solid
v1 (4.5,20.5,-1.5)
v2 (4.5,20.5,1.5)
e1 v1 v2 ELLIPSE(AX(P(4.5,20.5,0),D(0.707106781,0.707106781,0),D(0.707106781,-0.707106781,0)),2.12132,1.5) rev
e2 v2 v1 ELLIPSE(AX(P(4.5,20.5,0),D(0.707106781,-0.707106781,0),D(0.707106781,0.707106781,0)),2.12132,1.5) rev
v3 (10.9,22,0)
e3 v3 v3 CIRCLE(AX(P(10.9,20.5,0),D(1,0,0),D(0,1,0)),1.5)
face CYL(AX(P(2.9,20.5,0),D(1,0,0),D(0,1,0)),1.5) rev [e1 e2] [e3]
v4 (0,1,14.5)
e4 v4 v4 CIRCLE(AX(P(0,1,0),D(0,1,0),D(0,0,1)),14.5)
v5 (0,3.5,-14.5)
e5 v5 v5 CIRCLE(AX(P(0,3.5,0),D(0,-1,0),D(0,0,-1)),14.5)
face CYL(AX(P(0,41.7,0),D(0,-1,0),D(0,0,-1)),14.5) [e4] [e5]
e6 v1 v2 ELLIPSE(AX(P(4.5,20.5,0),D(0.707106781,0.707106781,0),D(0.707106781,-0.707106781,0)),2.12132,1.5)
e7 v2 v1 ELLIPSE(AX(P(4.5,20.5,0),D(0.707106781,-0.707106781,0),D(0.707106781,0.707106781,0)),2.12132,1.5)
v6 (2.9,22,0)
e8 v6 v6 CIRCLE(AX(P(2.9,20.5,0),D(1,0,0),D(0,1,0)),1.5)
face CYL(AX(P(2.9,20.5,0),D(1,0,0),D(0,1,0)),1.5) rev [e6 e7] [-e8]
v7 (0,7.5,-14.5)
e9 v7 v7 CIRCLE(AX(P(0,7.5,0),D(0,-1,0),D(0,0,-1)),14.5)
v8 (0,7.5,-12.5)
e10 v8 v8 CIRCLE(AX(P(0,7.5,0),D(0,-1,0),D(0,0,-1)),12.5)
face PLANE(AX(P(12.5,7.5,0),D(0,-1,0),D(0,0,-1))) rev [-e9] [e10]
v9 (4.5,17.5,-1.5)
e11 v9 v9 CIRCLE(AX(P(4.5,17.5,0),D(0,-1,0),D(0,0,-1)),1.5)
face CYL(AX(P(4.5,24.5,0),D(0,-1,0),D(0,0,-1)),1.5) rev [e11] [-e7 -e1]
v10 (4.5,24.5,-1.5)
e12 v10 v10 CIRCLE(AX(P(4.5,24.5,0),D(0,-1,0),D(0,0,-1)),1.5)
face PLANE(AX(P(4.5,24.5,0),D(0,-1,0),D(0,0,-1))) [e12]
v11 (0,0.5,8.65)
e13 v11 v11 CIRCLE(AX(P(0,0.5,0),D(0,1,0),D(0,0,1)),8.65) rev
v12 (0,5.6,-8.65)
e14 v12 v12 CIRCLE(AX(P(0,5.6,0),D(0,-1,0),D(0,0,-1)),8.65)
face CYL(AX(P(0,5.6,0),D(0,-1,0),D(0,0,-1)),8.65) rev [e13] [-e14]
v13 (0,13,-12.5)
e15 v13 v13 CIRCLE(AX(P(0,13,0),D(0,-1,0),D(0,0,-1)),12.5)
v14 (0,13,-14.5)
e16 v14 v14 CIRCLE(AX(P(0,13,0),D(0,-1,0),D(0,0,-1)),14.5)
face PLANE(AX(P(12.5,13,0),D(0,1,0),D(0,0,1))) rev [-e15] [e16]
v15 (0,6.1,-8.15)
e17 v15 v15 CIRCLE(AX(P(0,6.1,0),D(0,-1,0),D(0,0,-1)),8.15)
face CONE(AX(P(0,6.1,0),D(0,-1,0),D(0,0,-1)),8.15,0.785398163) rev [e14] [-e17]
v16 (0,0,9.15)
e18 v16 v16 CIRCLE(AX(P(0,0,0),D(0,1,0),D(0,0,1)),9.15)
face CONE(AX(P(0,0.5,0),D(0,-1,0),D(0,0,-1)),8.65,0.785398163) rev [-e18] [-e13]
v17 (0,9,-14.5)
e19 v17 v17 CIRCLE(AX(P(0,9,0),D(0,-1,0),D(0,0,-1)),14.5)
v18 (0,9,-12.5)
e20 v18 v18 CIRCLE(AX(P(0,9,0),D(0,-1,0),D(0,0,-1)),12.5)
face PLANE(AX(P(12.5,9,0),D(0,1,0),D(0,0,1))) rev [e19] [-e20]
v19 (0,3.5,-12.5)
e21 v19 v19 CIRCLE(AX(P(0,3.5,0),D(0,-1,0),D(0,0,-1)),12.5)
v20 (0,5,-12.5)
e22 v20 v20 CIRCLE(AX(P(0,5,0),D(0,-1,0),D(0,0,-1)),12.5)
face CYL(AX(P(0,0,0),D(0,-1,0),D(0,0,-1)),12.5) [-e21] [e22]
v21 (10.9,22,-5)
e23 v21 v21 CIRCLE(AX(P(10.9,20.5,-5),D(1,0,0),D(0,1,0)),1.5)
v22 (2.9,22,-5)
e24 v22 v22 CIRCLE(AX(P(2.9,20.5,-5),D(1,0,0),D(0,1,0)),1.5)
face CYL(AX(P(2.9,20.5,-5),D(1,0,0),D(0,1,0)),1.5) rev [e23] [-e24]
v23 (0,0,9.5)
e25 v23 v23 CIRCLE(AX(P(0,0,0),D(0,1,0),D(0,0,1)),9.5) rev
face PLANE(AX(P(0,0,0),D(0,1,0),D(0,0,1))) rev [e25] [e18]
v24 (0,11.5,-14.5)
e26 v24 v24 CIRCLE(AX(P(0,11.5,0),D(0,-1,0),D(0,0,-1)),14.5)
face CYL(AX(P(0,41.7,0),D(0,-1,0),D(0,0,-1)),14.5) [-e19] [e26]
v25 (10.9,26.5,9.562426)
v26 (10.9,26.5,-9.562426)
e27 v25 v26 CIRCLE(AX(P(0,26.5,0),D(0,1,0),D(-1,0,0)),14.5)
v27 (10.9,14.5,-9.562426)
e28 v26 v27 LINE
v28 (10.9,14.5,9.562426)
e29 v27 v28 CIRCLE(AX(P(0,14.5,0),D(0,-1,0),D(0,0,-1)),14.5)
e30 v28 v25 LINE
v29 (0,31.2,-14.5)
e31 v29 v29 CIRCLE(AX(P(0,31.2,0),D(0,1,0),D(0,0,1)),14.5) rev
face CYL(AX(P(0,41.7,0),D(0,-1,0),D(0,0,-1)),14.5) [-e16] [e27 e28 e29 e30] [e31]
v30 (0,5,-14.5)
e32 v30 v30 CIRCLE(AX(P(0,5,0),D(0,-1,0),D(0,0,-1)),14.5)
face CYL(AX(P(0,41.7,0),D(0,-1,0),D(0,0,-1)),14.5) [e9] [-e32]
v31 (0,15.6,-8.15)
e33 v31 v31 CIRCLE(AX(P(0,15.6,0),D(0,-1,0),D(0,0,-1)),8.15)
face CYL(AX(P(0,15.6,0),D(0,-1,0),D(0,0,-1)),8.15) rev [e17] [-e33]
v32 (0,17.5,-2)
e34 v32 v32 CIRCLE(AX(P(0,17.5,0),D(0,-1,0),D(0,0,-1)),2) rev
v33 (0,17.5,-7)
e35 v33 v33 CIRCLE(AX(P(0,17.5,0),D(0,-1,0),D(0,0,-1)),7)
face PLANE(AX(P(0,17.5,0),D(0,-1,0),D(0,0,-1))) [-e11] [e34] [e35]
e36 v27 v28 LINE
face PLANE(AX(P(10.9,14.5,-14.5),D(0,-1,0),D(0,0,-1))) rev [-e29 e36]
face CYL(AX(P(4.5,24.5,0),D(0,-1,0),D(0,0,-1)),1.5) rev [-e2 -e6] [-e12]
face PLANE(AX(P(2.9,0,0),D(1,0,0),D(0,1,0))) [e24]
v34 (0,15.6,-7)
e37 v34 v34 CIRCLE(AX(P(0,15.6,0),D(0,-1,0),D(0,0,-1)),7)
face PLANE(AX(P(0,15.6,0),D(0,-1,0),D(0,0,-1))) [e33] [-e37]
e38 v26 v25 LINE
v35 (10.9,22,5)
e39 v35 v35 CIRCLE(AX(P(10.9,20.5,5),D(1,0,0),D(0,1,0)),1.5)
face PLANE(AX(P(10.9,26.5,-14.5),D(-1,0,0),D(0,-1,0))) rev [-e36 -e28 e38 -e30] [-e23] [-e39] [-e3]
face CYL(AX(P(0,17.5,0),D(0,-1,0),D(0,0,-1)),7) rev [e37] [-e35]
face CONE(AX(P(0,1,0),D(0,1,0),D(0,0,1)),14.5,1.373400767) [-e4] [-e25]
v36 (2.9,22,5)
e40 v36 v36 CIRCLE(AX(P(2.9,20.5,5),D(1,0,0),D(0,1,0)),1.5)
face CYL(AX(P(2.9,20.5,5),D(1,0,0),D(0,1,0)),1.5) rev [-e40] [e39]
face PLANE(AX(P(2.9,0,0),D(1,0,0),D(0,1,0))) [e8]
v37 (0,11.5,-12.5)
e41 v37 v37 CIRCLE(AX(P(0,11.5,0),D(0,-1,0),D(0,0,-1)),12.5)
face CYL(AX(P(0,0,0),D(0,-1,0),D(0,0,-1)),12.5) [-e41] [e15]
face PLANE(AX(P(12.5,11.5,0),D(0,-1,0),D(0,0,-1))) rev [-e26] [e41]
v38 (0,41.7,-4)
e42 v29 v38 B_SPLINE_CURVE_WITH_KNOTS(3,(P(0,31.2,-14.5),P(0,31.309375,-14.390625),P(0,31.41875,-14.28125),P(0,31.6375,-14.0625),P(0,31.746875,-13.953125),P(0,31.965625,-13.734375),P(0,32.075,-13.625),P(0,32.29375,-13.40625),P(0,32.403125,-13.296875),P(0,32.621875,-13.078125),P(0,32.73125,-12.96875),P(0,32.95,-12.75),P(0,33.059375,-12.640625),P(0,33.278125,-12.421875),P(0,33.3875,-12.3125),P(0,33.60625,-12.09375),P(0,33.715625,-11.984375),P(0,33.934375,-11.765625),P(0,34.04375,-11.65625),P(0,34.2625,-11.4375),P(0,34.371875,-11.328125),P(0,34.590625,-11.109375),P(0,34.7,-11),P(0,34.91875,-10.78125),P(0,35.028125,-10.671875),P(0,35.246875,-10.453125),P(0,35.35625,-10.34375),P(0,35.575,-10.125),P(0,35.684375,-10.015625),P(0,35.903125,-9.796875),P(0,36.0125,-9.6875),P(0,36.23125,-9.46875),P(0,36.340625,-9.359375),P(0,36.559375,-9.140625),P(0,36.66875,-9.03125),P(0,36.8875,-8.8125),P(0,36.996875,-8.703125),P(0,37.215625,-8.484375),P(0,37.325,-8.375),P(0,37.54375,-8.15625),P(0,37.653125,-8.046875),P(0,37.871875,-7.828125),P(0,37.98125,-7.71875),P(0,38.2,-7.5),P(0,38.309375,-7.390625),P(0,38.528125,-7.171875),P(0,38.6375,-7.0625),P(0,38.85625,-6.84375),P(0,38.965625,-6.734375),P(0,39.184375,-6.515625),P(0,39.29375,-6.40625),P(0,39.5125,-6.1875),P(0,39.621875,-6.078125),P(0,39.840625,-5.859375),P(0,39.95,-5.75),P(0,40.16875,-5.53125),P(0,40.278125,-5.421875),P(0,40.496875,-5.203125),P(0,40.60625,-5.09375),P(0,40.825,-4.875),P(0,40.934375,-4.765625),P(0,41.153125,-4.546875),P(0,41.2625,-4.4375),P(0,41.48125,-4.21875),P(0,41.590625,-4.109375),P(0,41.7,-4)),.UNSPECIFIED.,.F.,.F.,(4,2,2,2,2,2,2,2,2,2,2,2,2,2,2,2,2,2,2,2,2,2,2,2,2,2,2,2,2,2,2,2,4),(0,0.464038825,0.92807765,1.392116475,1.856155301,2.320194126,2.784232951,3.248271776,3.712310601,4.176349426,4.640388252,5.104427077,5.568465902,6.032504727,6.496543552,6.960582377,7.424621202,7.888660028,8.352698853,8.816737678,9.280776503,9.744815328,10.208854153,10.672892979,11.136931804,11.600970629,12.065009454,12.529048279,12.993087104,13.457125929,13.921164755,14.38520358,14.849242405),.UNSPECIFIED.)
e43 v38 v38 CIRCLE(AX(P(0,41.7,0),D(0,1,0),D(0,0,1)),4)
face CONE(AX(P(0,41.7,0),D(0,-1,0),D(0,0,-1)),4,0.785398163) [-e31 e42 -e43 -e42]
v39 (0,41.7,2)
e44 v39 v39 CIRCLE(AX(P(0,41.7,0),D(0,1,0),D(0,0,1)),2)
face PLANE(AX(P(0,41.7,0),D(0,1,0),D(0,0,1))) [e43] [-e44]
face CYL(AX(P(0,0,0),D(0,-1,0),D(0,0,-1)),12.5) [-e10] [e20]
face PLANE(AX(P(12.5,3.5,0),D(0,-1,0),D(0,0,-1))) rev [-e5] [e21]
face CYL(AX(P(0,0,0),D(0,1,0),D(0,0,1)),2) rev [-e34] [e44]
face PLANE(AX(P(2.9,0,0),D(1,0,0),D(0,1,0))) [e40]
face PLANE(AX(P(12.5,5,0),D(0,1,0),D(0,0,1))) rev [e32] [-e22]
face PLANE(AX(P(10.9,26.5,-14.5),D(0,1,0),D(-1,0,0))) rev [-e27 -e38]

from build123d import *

# Parameters (mm, degrees)
SKETCH_1_R               = 14.5
EXTRUDE_1_DEPTH          = 41.7
CHAMFER_1_SIZE           = 10.5
SKETCH_2_R               = 2
CUT_EXTRUDE_1_DEPTH      = 47.469237136
CHAMFER_2_SIZE           = 5
CHAMFER_2_SIZE2          = 1
SKETCH_3_W               = 2
SKETCH_3_H               = 1.5
CUT_EXTRUDE_2_DEPTH      = 47.469237136
CUT_EXTRUDE_2_DEPTH_BACK = 47.469237136
SKETCH_5_W               = 6.979253001
SKETCH_5_H               = 12
SKETCH_6_R               = 8.65
CUT_EXTRUDE_3_DEPTH      = 5.6
CHAMFER_3_SIZE           = 0.5
SKETCH_7_R               = 8.15
CUT_EXTRUDE_4_DEPTH      = 15.6
CHAMFER_4_SIZE           = 0.5
SKETCH_8_R               = 7
CUT_EXTRUDE_5_DEPTH      = 17.5
CUT_EXTRUDE_6_DEPTH      = 8
CUT_EXTRUDE_7_DEPTH      = 8
SKETCH_10_R              = 1.5
CUT_EXTRUDE_8_DEPTH      = 7


with BuildPart() as part:
    # 草图1 → 凸台-拉伸1 (new body)
    with BuildSketch(Plane(origin=(0, 0, 0), x_dir=(1, 0, 0), z_dir=(0, 1, 0))):
        with Locations(Location((0, 0, 0), (0, 0, 270))):
            Circle(SKETCH_1_R)
    extrude(amount=EXTRUDE_1_DEPTH)

    # 倒角1
    chamfer_1_edges = [part.edges().sort_by_distance(p)[0] for p in [
        (0, 41.7, -14.5),
    ]]
    chamfer(chamfer_1_edges, length=CHAMFER_1_SIZE)

    # 草图2 → 切除-拉伸1 (cut, through all)
    with BuildSketch(Plane(origin=(0, 41.7, 0), x_dir=(1, 0, 0), z_dir=(0, 1, 0))):
        with Locations(Location((0, 0, 0), (0, 0, 270))):
            Circle(SKETCH_2_R)
    extrude(amount=-CUT_EXTRUDE_1_DEPTH, mode=Mode.SUBTRACT)

    # 倒角2
    chamfer_2_edges = [part.edges().sort_by_distance(p)[0] for p in [
        (0, 0, -14.5),
    ]]
    chamfer_2_side = [part.faces().sort_by_distance(p)[0] for p in [
        (0, 0, -14.089878067),
    ]]
    chamfer(chamfer_2_edges, length=CHAMFER_2_SIZE, length2=CHAMFER_2_SIZE2, reference=chamfer_2_side[0])

    # 草图3 → 切除-旋转1 (revolve, cut)
    with BuildSketch(Plane.XY, mode=Mode.PRIVATE) as cut_revolve_1_sk:
        with Locations((13.5, 4.25)):
            Rectangle(SKETCH_3_W, SKETCH_3_H)
        with Locations((13.5, 8.25)):
            Rectangle(SKETCH_3_W, SKETCH_3_H)
        with Locations((13.5, 12.25)):
            Rectangle(SKETCH_3_W, SKETCH_3_H)
    revolve(cut_revolve_1_sk.sketch.rotate(Axis((0, 0, 0), (0, 1, 0)), 90), axis=Axis((0, 0, 0), (0, 1, 0)), mode=Mode.SUBTRACT)

    # 草图5 → 切除-拉伸2 (cut, two sides: drawn at the far end of the back side and taken through both)
    with BuildSketch(Plane.XY.offset(-CUT_EXTRUDE_2_DEPTH_BACK)):
        with Locations((14.389626501, 20.5)):
            Rectangle(SKETCH_5_W, SKETCH_5_H)
    extrude(amount=CUT_EXTRUDE_2_DEPTH + CUT_EXTRUDE_2_DEPTH_BACK, mode=Mode.SUBTRACT)

    # 草图6 → 切除-拉伸3 (cut)
    with BuildSketch(Plane.XZ):
        with Locations(Location((0, 0, 0), (0, 0, 270))):
            Circle(SKETCH_6_R)
    extrude(amount=-CUT_EXTRUDE_3_DEPTH, mode=Mode.SUBTRACT)

    # 倒角3
    chamfer_3_edges = [part.edges().sort_by_distance(p)[0] for p in [
        (0, 0, 8.65),
    ]]
    chamfer(chamfer_3_edges, length=CHAMFER_3_SIZE)

    # 草图7 → 切除-拉伸4 (cut)
    with BuildSketch(Plane.XZ):
        with Locations(Location((0, 0, 0), (0, 0, 270))):
            Circle(SKETCH_7_R)
    extrude(amount=-CUT_EXTRUDE_4_DEPTH, mode=Mode.SUBTRACT)

    # 倒角4
    chamfer_4_edges = [part.edges().sort_by_distance(p)[0] for p in [
        (0, 5.6, 8.15),
    ]]
    chamfer(chamfer_4_edges, length=CHAMFER_4_SIZE - 0.0001)  # a hair under: the kernel refuses the full size

    # 草图8 → 切除-拉伸5 (cut)
    with BuildSketch(Plane.XZ):
        with Locations(Location((0, 0, 0), (0, 0, 270))):
            Circle(SKETCH_8_R)
    extrude(amount=-CUT_EXTRUDE_5_DEPTH, mode=Mode.SUBTRACT)

    # 草图9 → 切除-拉伸6 (cut)
    with BuildSketch(Plane(origin=(10.9, 0, 0), x_dir=(0, 0, -1), z_dir=(1, 0, 0))):
        with BuildLine():
            ThreePointArc((-3.5, 20.5), (-5, 22), (-6.5, 20.5))
            Line((-6.5, 20.5), (-3.5, 20.5))
        make_face()
        with BuildLine():
            Line((-3.5, 20.5), (-6.5, 20.5))
            ThreePointArc((-6.5, 20.5), (-5, 19), (-3.5, 20.5))
        make_face()
        with BuildLine():
            ThreePointArc((6.5, 20.5), (5, 22), (3.5, 20.5))
            Line((3.5, 20.5), (6.5, 20.5))
        make_face()
        with BuildLine():
            Line((6.5, 20.5), (3.5, 20.5))
            ThreePointArc((3.5, 20.5), (5, 19), (6.5, 20.5))
        make_face()
    extrude(amount=-CUT_EXTRUDE_6_DEPTH, mode=Mode.SUBTRACT)

    # 草图9<3> → 切除-拉伸7 (cut)
    with BuildSketch(Plane(origin=(10.9, 0, 0), x_dir=(0, 0, -1), z_dir=(1, 0, 0))):
        with BuildLine():
            ThreePointArc((1.5, 20.5), (0, 22), (-1.5, 20.5))
            Line((-1.5, 20.5), (1.5, 20.5))
        make_face()
        with BuildLine():
            Line((1.5, 20.5), (-1.5, 20.5))
            ThreePointArc((-1.5, 20.5), (0, 19), (1.5, 20.5))
        make_face()
    extrude(amount=-CUT_EXTRUDE_7_DEPTH, mode=Mode.SUBTRACT)

    # 草图10 → 切除-拉伸8 (cut)
    with BuildSketch(Plane.XZ.offset(-17.5)):
        with Locations(Location((4.5, 0, 0), (0, 0, 270))):
            Circle(SKETCH_10_R)
    extrude(amount=-CUT_EXTRUDE_8_DEPTH, mode=Mode.SUBTRACT)


solid = part.part
